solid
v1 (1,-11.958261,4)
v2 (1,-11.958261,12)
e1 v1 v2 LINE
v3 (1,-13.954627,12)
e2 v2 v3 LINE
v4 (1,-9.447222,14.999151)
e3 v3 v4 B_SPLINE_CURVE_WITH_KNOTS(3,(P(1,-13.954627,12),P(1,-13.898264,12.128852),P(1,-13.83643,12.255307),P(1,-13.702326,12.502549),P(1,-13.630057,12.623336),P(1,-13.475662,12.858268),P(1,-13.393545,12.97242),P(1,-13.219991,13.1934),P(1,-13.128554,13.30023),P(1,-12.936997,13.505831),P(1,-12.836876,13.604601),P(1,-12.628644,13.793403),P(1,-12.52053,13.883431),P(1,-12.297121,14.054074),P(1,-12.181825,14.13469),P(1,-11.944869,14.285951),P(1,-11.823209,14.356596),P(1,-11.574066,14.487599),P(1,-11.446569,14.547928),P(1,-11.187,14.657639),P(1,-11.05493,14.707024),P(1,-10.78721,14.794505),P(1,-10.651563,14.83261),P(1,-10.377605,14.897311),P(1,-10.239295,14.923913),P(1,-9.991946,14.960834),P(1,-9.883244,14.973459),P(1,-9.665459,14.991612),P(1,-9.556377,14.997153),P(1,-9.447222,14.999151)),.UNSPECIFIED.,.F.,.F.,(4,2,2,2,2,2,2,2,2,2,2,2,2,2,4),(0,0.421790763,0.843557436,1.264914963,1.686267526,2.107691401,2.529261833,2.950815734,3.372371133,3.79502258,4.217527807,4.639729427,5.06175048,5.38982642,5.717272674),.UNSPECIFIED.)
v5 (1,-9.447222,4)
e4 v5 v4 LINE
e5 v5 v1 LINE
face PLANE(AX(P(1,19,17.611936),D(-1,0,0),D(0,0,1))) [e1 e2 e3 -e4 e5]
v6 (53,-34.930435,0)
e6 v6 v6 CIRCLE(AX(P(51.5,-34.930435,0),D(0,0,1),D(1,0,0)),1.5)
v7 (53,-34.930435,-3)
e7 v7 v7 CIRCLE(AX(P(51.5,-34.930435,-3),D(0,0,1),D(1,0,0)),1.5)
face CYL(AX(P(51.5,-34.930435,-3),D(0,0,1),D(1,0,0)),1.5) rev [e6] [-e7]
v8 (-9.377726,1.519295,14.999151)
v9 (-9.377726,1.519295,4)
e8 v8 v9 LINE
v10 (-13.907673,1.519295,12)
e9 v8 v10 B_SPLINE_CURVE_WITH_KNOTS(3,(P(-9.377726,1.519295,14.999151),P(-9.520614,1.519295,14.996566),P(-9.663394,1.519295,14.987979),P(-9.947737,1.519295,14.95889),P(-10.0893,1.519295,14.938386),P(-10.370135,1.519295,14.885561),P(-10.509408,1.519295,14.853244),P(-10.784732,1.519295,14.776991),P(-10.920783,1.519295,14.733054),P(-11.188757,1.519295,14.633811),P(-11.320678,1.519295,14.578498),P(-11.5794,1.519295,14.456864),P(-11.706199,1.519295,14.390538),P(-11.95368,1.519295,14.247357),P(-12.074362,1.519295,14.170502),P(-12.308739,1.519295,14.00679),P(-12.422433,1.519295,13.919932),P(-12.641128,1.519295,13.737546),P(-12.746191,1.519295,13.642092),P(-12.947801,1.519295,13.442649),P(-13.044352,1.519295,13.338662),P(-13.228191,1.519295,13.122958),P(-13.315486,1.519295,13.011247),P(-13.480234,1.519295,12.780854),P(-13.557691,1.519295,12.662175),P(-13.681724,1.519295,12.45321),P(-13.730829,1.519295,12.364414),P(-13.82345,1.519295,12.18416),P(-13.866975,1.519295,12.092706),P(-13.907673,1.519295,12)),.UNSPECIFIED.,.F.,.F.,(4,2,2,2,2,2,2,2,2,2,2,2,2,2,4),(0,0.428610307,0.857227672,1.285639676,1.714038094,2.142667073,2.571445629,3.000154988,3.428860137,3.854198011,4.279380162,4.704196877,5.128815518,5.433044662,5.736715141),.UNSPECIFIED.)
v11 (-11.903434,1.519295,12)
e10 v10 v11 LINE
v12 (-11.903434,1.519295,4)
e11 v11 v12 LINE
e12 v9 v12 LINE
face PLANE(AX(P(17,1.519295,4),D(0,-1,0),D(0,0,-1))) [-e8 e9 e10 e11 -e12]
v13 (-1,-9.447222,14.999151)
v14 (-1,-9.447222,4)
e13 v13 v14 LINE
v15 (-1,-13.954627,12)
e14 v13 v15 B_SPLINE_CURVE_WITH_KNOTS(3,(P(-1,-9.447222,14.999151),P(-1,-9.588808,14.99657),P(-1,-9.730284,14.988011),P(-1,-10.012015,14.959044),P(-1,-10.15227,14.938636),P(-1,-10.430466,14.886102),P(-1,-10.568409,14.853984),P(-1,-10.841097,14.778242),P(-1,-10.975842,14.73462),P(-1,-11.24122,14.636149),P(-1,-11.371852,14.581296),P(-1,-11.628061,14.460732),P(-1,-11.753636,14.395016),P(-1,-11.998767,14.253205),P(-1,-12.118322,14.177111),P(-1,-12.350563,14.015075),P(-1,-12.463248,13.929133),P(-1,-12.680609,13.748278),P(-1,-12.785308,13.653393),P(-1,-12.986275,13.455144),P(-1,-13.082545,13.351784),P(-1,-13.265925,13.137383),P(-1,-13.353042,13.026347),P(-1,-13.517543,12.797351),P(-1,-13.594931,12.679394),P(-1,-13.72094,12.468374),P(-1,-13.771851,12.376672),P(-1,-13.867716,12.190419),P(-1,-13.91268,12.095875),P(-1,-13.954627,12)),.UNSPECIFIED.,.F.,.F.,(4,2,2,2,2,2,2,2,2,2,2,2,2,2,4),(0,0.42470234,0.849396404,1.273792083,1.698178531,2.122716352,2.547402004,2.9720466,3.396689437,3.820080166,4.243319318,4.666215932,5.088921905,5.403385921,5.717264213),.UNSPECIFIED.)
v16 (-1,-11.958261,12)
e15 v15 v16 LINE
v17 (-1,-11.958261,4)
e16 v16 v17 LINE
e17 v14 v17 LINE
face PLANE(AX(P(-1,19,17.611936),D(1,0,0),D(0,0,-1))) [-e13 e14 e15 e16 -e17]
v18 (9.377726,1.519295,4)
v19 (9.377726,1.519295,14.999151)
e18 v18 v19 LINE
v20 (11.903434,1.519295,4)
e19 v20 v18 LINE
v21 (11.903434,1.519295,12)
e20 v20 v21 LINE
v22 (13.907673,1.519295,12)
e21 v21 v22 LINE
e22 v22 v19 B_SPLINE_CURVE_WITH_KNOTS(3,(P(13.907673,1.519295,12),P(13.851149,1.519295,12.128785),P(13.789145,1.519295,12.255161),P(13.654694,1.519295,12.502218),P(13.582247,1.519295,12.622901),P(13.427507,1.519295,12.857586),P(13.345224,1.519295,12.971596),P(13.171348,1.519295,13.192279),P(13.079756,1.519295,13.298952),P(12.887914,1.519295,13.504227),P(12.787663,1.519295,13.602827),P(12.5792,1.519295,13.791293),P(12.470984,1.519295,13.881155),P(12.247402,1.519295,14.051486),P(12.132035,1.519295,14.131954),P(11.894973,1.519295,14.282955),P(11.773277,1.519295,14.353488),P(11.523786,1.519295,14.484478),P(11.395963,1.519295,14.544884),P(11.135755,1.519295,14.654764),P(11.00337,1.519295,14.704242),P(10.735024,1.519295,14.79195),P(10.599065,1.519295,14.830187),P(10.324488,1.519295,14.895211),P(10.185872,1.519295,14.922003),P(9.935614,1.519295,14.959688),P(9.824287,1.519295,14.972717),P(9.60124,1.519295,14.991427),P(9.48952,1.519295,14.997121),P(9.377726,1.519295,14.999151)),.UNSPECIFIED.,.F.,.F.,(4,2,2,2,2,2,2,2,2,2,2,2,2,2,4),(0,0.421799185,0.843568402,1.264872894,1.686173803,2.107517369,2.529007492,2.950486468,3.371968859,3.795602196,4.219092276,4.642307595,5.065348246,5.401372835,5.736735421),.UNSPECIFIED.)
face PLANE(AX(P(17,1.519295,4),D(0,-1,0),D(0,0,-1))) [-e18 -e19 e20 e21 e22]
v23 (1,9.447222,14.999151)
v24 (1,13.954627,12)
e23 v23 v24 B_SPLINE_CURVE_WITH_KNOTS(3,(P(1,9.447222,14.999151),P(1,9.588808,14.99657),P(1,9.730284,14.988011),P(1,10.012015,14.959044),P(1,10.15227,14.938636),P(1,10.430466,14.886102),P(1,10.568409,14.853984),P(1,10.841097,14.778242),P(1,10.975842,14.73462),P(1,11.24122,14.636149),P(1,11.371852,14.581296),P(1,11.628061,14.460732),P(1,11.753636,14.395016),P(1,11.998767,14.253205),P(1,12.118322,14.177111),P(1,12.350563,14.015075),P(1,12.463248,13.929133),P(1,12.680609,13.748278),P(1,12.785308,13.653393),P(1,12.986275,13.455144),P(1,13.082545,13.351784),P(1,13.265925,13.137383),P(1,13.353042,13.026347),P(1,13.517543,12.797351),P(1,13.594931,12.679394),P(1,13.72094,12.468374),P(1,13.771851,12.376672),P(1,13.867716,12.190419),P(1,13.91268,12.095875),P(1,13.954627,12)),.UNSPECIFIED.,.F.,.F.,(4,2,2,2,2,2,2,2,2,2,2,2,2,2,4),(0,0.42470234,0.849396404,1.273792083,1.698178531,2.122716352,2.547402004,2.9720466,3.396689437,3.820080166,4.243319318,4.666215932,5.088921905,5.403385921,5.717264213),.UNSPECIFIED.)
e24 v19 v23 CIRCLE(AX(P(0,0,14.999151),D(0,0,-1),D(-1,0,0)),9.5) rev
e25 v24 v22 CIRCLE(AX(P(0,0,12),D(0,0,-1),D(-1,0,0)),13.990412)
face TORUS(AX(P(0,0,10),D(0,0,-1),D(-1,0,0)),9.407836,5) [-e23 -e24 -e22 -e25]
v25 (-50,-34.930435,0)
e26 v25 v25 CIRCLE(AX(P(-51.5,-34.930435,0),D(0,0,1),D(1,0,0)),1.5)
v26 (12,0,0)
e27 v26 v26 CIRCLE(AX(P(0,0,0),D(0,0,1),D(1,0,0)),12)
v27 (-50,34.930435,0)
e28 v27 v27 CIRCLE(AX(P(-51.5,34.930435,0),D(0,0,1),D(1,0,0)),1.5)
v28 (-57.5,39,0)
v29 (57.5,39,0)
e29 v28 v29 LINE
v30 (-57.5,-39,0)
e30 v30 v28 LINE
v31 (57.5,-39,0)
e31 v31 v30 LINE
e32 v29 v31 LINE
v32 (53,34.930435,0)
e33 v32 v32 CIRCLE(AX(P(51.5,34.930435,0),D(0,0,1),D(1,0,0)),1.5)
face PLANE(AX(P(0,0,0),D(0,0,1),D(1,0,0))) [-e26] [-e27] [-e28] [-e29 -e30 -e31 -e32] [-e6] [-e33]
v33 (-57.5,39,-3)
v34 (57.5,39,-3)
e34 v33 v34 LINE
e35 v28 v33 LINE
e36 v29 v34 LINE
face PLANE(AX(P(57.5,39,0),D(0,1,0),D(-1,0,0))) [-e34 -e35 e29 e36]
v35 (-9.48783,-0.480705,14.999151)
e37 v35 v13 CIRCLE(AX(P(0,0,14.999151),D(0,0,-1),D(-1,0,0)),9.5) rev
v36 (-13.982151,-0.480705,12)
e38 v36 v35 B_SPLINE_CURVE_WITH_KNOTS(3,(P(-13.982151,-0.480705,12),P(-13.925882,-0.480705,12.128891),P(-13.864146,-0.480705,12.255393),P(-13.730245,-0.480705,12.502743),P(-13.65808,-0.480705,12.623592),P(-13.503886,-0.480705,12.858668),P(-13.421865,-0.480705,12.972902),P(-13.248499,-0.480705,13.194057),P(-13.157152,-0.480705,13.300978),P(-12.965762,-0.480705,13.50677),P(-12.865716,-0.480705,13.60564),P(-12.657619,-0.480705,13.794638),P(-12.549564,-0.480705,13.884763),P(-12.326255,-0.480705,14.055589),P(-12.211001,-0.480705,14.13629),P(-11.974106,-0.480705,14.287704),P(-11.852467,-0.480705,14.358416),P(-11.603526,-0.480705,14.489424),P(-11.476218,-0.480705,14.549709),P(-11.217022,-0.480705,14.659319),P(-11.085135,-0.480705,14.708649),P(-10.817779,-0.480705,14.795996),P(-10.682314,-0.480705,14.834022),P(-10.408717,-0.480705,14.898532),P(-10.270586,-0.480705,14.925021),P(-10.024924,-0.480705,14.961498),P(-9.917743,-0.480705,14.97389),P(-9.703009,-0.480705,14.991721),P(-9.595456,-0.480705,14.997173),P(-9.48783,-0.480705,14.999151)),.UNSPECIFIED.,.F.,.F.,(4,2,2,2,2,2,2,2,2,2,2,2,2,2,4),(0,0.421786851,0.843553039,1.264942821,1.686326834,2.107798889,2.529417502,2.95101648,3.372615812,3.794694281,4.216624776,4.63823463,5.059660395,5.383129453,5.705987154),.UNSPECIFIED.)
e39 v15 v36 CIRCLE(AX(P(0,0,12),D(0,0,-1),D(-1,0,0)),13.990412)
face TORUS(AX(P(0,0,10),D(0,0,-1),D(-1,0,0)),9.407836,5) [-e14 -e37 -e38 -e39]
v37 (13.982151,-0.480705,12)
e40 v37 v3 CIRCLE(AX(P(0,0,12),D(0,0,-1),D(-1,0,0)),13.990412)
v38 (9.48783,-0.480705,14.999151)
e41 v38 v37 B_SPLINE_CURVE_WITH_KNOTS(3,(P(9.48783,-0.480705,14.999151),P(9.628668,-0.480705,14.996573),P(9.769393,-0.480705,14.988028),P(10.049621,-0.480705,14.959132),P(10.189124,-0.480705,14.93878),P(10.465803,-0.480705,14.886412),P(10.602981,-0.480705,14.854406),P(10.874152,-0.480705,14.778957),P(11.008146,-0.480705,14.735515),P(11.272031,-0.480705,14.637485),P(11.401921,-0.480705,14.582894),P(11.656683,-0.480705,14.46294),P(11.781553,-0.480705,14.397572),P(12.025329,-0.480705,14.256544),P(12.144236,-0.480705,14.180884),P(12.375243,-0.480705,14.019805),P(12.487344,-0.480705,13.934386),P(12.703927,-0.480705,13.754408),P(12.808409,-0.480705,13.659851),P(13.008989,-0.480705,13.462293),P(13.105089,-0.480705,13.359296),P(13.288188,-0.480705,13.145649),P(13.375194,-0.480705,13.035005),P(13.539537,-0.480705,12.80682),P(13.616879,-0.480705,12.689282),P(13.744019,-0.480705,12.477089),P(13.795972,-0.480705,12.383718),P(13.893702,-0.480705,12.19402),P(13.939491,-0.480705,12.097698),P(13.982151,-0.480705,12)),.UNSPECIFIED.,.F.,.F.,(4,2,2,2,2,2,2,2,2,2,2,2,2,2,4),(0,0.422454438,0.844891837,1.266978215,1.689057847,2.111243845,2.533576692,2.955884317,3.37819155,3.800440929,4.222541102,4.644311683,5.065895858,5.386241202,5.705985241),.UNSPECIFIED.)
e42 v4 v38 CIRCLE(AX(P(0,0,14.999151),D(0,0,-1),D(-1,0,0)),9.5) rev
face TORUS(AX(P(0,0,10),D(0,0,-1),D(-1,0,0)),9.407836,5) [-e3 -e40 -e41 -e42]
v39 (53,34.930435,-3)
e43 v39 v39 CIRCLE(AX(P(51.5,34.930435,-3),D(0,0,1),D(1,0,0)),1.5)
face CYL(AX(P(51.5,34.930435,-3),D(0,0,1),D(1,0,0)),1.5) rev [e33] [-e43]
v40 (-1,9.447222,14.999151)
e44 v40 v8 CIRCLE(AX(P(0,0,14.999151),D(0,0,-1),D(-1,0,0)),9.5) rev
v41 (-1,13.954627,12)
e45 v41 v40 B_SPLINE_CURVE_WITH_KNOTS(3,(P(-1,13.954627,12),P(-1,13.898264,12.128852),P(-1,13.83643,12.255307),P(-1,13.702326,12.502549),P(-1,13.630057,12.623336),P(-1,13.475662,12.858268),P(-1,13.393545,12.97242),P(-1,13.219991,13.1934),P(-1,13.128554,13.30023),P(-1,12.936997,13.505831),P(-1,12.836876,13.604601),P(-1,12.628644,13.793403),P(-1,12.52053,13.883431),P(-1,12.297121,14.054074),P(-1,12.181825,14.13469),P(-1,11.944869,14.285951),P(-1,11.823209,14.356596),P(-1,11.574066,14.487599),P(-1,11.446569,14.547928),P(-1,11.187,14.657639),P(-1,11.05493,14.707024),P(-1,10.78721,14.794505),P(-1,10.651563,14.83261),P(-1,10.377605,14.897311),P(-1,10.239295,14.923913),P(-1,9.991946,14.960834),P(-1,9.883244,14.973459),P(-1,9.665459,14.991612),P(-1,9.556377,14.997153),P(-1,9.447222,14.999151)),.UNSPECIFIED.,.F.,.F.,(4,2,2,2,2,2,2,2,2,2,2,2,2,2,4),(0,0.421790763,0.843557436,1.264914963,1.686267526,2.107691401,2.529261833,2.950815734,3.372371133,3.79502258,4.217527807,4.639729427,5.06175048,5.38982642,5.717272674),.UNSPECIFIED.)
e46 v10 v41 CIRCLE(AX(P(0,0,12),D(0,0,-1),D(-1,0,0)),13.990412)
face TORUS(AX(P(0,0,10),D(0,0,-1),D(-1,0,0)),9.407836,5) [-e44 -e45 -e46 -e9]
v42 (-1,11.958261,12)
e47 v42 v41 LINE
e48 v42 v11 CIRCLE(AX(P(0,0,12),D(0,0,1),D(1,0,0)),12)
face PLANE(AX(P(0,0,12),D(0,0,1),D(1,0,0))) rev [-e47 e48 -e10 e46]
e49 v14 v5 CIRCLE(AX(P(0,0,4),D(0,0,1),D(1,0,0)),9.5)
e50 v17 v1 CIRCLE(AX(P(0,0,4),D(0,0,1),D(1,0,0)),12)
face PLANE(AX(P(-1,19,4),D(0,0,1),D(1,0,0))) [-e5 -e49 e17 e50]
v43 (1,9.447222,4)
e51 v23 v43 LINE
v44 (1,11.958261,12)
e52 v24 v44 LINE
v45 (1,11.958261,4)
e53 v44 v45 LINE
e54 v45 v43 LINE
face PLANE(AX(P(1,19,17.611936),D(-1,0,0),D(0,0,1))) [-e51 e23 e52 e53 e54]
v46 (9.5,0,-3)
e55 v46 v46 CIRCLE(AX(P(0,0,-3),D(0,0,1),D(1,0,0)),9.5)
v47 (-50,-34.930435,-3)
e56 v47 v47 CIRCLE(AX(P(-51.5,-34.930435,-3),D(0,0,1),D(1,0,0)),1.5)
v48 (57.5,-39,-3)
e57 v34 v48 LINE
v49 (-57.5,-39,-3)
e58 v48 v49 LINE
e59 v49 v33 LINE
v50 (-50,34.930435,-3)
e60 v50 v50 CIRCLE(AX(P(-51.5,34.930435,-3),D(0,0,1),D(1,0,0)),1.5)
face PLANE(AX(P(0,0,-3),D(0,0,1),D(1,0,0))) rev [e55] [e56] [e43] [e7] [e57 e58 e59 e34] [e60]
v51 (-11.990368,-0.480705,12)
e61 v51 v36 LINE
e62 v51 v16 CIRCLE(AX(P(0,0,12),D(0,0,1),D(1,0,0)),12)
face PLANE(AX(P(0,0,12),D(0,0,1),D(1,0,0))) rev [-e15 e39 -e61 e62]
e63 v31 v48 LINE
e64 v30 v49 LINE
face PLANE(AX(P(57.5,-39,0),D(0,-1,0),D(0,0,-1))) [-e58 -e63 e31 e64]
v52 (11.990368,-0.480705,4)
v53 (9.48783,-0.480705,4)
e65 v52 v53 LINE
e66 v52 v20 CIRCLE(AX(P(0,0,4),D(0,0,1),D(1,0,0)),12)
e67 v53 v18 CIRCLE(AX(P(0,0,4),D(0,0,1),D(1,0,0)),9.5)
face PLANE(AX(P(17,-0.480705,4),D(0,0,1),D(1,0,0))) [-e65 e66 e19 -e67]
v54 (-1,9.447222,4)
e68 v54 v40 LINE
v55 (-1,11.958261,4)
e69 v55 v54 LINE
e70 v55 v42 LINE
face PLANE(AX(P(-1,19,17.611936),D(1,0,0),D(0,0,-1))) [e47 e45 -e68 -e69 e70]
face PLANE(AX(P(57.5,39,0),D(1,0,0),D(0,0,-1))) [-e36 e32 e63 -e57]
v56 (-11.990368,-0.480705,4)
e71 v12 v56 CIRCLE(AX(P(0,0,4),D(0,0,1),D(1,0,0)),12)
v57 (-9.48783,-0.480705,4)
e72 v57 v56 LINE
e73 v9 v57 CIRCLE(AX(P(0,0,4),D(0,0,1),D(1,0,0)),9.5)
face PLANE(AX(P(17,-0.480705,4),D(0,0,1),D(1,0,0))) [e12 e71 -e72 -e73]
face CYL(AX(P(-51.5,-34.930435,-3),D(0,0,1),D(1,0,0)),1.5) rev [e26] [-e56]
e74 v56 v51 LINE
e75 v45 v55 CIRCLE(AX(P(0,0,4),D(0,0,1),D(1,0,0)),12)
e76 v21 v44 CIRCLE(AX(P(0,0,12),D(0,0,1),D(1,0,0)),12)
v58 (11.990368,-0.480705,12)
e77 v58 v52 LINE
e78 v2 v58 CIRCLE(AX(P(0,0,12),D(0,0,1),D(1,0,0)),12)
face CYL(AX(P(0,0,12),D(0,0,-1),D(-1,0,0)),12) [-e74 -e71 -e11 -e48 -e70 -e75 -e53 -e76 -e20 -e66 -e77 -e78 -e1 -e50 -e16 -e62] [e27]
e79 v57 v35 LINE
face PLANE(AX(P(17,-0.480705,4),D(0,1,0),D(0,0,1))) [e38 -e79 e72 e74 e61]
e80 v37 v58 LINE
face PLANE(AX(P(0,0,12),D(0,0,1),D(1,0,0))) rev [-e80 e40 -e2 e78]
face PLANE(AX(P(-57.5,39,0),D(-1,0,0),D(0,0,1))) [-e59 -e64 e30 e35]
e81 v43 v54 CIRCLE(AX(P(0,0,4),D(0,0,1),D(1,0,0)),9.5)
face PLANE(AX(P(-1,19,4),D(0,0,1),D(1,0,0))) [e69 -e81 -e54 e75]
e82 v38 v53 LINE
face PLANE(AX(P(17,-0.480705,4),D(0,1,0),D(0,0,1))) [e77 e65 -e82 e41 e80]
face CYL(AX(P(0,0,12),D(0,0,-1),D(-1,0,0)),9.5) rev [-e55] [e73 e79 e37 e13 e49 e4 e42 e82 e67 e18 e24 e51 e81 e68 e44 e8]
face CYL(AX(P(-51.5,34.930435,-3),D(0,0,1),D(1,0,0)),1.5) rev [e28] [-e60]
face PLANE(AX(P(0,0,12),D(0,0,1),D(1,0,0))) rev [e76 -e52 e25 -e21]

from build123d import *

# Parameters (mm, degrees)
ESBO_O1_R                      = 12
ESBO_O1_R_2                    = 9.5
RESSALTO_EXTRUS_O1_DEPTH       = 12
RESSALTO_EXTRUS_O2_START       = 12
RESSALTO_EXTRUS_O2_OUTLINE_R   = 13.990411925
RESSALTO_EXTRUS_O2_OUTLINE_R_2 = 9.5
RESSALTO_EXTRUS_O2_DEPTH       = 3
CORTE_EXTRUS_O1_DEPTH          = 17
CORTE_EXTRUS_O1_DEPTH_BACK     = 19
ESBO_O2_W                      = 17.351165954
ESBO_O2_H                      = 2
CORTE_EXTRUS_O2_DEPTH          = 19
CORTE_EXTRUS_O2_DEPTH_BACK     = 19
ESBO_O3_W                      = 2
ESBO_O3_H                      = 13.611936421
FILETE1_R                      = 5
FILETE2_R                      = 5
FILETE3_R                      = 5
FILETE4_R                      = 5
RESSALTO_EXTRUS_O3_START       = 3
F_3DSKETCH3_R                  = 9.5
RESSALTO_EXTRUS_O3_DEPTH       = 3
CORTE_EXTRUS_O3_DEPTH          = 14
CORTE_EXTRUS_O3_DEPTH_BACK     = 63
F_3DSKETCH4_R                  = 1.5


with BuildPart() as part:
    # Esboço1 → Ressalto-extrusão1 (new body)
    with BuildSketch(Plane.XY):
        Circle(ESBO_O1_R)
        Circle(ESBO_O1_R_2, mode=Mode.SUBTRACT)
    extrude(amount=RESSALTO_EXTRUS_O1_DEPTH)

    # Ressalto-extrusão2: read off the stored shape, not the designer's step
    # Ressalto-extrusão2 outline → Ressalto-extrusão2 (add)
    with BuildSketch(Plane.XY.offset(RESSALTO_EXTRUS_O2_START)):
        Circle(RESSALTO_EXTRUS_O2_OUTLINE_R)
        Circle(RESSALTO_EXTRUS_O2_OUTLINE_R_2, mode=Mode.SUBTRACT)
    extrude(amount=RESSALTO_EXTRUS_O2_DEPTH)

    # Esboço2 → Corte-extrusão1 (cut, two sides: drawn at the far end of the back side and taken through both)
    with BuildSketch(Plane(origin=(0, 0, 0), x_dir=(0, 0, -1), z_dir=(1, 0, 0)).offset(-CORTE_EXTRUS_O1_DEPTH_BACK)):
        with Locations((-12.675582977, 0.519294875)):
            Rectangle(ESBO_O2_W, ESBO_O2_H)
    extrude(amount=CORTE_EXTRUS_O1_DEPTH + CORTE_EXTRUS_O1_DEPTH_BACK, mode=Mode.SUBTRACT)

    # Esboço3 → Corte-extrusão2 (cut, two sides: drawn at the far end of the back side and taken through both)
    with BuildSketch(Plane(origin=(0, 0, 0), x_dir=(1, 0, 0), z_dir=(0, 1, 0)).offset(-CORTE_EXTRUS_O2_DEPTH_BACK)):
        with Locations((0, -10.80596821)):
            Rectangle(ESBO_O3_W, ESBO_O3_H)
    extrude(amount=CORTE_EXTRUS_O2_DEPTH + CORTE_EXTRUS_O2_DEPTH_BACK, mode=Mode.SUBTRACT)

    # Filete1
    # the kernel refuses this fillet: 5 mm, written as the material it takes off along each edge
    with BuildSketch(Plane(origin=(0, 0, 15), x_dir=(0.7581495843682223, -0.6520806757773855, 0), z_dir=(-0.6520806757773855, -0.7581495843682223, 0))) as filete1_piece_1_section:
        with BuildLine():
            CenterArc((9.40783623, -5), FILETE1_R, 23.578178478, 66.421821522)
            Line((9.40783623, 0), (13.990411925, 0))
            Line((13.990411925, 0), (13.990411925, -3))
        make_face()
    filete1_piece_1 = revolve(axis=Axis((0, 0, 15), (0, 0, 1)), revolution_arc=173.532819647, mode=Mode.PRIVATE)
    filete1_piece_1 = split(filete1_piece_1, bisect_by=Plane(origin=(1, 0, 15), z_dir=(1, 0, 0)), keep=Keep.TOP, mode=Mode.PRIVATE)
    filete1_piece_1 = split(filete1_piece_1, bisect_by=Plane(origin=(0, 1.519294875, 15), z_dir=(0, 1, 0)), keep=Keep.TOP, mode=Mode.PRIVATE)
    add(filete1_piece_1, mode=Mode.SUBTRACT)

    # Filete2
    # the kernel refuses this fillet: 5 mm, written as the material it takes off along each edge
    with BuildSketch(Plane(origin=(0, 0, 15), x_dir=(-0.679899413949249, -0.7333053844828004, 0), z_dir=(-0.7333053844828004, 0.679899413949249, 0))) as filete2_piece_1_section:
        with BuildLine():
            CenterArc((9.40783623, -5), FILETE2_R, 23.578178478, 66.421821522)
            Line((13.990411925, -3), (13.990411925, 0))
            Line((13.990411925, 0), (9.40783623, 0))
        make_face()
    filete2_piece_1 = revolve(axis=Axis((0, 0, 15), (0, 0, 1)), revolution_arc=177.801374174, mode=Mode.PRIVATE)
    filete2_piece_1 = split(filete2_piece_1, bisect_by=Plane(origin=(-1, 0, 15), z_dir=(1, 0, 0)), keep=Keep.TOP, mode=Mode.PRIVATE)
    add(filete2_piece_1, mode=Mode.SUBTRACT)

    # Filete3
    # the kernel refuses this fillet: 5 mm, written as the material it takes off along each edge
    with BuildSketch(Plane(origin=(0, 0, 15), x_dir=(-0.7075313095917145, 0.7066819977524781, 0), z_dir=(0.7066819977524781, 0.7075313095917145, 0))) as filete3_piece_1_section:
        with BuildLine():
            CenterArc((9.40783623, -5), FILETE3_R, 23.578178478, 66.421821522)
            Line((13.990411925, -3), (13.990411925, 0))
            Line((13.990411925, 0), (9.40783623, 0))
        make_face()
    filete3_piece_1 = revolve(axis=Axis((0, 0, 15), (0, 0, 1)), revolution_arc=177.801374174, mode=Mode.PRIVATE)
    filete3_piece_1 = split(filete3_piece_1, bisect_by=Plane(origin=(0, -0.480705125, 15), z_dir=(0, -1, 0)), keep=Keep.TOP, mode=Mode.PRIVATE)
    add(filete3_piece_1, mode=Mode.SUBTRACT)

    # Filete4
    # the kernel refuses this fillet: 5 mm, written as the material it takes off along each edge
    with BuildSketch(Plane(origin=(0, 0, 15), x_dir=(0.6677059228451385, 0.744425147746583, 0), z_dir=(0.744425147746583, -0.6677059228451385, 0))) as filete4_piece_1:
        with BuildLine():
            CenterArc((9.407462566, -4.999143609), FILETE4_R, 23.567471489, 65.372067079)
            Line((13.990411925, -3), (14.082070912, -2.960017128))
            ThreePointArc((14.082070912, -2.960017128), (14.090411925, -1.5), (14.090411925, 0))
            Line((14.090411925, 0), (13.990411925, 0.1))
            ThreePointArc((13.990411925, 0.1), (11.745205963, 0.1), (9.501850749, 0.099982872))
            Line((9.501850749, 0.099982872), (9.5, 0))
        make_face()
    revolve(axis=Axis((0, 0, 15), (0, 0, 1)), revolution_arc=171.645006374, mode=Mode.SUBTRACT)

    # 3DSketch3 → Ressalto-extrusão3 (add)
    with BuildSketch(Plane(origin=(57.5, 39, 0), x_dir=(-0.8275951732462348, -0.5613254218539678, 0), z_dir=(0, 0, -1)).offset(RESSALTO_EXTRUS_O3_START)):
        Polygon((0, 0), (95.173444923, 64.552423513), (138.956827828, 0), (43.783382905, -64.552423513), align=None)
        with Locations(Location((69.478413914, 0, 0), (0, 0, 31.247073166))):
            Circle(F_3DSKETCH3_R, mode=Mode.SUBTRACT)
    extrude(amount=-RESSALTO_EXTRUS_O3_DEPTH)

    # 3DSketch4 → Corte-extrusão3 (cut, two sides: drawn at the far end of the back side and taken through both)
    with BuildSketch(Plane(origin=(51.5, 34.930434783, -3), x_dir=(-0.8275951732462347, -0.5613254218539678, 0), z_dir=(0, 0, 1)).offset(-CORTE_EXTRUS_O3_DEPTH_BACK)):
        with Locations(Location((0, 0, 0), (0, 0, 145.85249086))):
            Circle(F_3DSKETCH4_R)
        with Locations(Location((39.21468208, 57.816518451, 0), (0, 0, 145.85249086))):
            Circle(F_3DSKETCH4_R)
        with Locations(Location((124.456984924, 0, 0), (0, 0, 145.85249086))):
            Circle(F_3DSKETCH4_R)
        with Locations(Location((85.242302844, -57.816518451, 0), (0, 0, 145.85249086))):
            Circle(F_3DSKETCH4_R)
    extrude(amount=CORTE_EXTRUS_O3_DEPTH + CORTE_EXTRUS_O3_DEPTH_BACK, mode=Mode.SUBTRACT)


solid = part.part
